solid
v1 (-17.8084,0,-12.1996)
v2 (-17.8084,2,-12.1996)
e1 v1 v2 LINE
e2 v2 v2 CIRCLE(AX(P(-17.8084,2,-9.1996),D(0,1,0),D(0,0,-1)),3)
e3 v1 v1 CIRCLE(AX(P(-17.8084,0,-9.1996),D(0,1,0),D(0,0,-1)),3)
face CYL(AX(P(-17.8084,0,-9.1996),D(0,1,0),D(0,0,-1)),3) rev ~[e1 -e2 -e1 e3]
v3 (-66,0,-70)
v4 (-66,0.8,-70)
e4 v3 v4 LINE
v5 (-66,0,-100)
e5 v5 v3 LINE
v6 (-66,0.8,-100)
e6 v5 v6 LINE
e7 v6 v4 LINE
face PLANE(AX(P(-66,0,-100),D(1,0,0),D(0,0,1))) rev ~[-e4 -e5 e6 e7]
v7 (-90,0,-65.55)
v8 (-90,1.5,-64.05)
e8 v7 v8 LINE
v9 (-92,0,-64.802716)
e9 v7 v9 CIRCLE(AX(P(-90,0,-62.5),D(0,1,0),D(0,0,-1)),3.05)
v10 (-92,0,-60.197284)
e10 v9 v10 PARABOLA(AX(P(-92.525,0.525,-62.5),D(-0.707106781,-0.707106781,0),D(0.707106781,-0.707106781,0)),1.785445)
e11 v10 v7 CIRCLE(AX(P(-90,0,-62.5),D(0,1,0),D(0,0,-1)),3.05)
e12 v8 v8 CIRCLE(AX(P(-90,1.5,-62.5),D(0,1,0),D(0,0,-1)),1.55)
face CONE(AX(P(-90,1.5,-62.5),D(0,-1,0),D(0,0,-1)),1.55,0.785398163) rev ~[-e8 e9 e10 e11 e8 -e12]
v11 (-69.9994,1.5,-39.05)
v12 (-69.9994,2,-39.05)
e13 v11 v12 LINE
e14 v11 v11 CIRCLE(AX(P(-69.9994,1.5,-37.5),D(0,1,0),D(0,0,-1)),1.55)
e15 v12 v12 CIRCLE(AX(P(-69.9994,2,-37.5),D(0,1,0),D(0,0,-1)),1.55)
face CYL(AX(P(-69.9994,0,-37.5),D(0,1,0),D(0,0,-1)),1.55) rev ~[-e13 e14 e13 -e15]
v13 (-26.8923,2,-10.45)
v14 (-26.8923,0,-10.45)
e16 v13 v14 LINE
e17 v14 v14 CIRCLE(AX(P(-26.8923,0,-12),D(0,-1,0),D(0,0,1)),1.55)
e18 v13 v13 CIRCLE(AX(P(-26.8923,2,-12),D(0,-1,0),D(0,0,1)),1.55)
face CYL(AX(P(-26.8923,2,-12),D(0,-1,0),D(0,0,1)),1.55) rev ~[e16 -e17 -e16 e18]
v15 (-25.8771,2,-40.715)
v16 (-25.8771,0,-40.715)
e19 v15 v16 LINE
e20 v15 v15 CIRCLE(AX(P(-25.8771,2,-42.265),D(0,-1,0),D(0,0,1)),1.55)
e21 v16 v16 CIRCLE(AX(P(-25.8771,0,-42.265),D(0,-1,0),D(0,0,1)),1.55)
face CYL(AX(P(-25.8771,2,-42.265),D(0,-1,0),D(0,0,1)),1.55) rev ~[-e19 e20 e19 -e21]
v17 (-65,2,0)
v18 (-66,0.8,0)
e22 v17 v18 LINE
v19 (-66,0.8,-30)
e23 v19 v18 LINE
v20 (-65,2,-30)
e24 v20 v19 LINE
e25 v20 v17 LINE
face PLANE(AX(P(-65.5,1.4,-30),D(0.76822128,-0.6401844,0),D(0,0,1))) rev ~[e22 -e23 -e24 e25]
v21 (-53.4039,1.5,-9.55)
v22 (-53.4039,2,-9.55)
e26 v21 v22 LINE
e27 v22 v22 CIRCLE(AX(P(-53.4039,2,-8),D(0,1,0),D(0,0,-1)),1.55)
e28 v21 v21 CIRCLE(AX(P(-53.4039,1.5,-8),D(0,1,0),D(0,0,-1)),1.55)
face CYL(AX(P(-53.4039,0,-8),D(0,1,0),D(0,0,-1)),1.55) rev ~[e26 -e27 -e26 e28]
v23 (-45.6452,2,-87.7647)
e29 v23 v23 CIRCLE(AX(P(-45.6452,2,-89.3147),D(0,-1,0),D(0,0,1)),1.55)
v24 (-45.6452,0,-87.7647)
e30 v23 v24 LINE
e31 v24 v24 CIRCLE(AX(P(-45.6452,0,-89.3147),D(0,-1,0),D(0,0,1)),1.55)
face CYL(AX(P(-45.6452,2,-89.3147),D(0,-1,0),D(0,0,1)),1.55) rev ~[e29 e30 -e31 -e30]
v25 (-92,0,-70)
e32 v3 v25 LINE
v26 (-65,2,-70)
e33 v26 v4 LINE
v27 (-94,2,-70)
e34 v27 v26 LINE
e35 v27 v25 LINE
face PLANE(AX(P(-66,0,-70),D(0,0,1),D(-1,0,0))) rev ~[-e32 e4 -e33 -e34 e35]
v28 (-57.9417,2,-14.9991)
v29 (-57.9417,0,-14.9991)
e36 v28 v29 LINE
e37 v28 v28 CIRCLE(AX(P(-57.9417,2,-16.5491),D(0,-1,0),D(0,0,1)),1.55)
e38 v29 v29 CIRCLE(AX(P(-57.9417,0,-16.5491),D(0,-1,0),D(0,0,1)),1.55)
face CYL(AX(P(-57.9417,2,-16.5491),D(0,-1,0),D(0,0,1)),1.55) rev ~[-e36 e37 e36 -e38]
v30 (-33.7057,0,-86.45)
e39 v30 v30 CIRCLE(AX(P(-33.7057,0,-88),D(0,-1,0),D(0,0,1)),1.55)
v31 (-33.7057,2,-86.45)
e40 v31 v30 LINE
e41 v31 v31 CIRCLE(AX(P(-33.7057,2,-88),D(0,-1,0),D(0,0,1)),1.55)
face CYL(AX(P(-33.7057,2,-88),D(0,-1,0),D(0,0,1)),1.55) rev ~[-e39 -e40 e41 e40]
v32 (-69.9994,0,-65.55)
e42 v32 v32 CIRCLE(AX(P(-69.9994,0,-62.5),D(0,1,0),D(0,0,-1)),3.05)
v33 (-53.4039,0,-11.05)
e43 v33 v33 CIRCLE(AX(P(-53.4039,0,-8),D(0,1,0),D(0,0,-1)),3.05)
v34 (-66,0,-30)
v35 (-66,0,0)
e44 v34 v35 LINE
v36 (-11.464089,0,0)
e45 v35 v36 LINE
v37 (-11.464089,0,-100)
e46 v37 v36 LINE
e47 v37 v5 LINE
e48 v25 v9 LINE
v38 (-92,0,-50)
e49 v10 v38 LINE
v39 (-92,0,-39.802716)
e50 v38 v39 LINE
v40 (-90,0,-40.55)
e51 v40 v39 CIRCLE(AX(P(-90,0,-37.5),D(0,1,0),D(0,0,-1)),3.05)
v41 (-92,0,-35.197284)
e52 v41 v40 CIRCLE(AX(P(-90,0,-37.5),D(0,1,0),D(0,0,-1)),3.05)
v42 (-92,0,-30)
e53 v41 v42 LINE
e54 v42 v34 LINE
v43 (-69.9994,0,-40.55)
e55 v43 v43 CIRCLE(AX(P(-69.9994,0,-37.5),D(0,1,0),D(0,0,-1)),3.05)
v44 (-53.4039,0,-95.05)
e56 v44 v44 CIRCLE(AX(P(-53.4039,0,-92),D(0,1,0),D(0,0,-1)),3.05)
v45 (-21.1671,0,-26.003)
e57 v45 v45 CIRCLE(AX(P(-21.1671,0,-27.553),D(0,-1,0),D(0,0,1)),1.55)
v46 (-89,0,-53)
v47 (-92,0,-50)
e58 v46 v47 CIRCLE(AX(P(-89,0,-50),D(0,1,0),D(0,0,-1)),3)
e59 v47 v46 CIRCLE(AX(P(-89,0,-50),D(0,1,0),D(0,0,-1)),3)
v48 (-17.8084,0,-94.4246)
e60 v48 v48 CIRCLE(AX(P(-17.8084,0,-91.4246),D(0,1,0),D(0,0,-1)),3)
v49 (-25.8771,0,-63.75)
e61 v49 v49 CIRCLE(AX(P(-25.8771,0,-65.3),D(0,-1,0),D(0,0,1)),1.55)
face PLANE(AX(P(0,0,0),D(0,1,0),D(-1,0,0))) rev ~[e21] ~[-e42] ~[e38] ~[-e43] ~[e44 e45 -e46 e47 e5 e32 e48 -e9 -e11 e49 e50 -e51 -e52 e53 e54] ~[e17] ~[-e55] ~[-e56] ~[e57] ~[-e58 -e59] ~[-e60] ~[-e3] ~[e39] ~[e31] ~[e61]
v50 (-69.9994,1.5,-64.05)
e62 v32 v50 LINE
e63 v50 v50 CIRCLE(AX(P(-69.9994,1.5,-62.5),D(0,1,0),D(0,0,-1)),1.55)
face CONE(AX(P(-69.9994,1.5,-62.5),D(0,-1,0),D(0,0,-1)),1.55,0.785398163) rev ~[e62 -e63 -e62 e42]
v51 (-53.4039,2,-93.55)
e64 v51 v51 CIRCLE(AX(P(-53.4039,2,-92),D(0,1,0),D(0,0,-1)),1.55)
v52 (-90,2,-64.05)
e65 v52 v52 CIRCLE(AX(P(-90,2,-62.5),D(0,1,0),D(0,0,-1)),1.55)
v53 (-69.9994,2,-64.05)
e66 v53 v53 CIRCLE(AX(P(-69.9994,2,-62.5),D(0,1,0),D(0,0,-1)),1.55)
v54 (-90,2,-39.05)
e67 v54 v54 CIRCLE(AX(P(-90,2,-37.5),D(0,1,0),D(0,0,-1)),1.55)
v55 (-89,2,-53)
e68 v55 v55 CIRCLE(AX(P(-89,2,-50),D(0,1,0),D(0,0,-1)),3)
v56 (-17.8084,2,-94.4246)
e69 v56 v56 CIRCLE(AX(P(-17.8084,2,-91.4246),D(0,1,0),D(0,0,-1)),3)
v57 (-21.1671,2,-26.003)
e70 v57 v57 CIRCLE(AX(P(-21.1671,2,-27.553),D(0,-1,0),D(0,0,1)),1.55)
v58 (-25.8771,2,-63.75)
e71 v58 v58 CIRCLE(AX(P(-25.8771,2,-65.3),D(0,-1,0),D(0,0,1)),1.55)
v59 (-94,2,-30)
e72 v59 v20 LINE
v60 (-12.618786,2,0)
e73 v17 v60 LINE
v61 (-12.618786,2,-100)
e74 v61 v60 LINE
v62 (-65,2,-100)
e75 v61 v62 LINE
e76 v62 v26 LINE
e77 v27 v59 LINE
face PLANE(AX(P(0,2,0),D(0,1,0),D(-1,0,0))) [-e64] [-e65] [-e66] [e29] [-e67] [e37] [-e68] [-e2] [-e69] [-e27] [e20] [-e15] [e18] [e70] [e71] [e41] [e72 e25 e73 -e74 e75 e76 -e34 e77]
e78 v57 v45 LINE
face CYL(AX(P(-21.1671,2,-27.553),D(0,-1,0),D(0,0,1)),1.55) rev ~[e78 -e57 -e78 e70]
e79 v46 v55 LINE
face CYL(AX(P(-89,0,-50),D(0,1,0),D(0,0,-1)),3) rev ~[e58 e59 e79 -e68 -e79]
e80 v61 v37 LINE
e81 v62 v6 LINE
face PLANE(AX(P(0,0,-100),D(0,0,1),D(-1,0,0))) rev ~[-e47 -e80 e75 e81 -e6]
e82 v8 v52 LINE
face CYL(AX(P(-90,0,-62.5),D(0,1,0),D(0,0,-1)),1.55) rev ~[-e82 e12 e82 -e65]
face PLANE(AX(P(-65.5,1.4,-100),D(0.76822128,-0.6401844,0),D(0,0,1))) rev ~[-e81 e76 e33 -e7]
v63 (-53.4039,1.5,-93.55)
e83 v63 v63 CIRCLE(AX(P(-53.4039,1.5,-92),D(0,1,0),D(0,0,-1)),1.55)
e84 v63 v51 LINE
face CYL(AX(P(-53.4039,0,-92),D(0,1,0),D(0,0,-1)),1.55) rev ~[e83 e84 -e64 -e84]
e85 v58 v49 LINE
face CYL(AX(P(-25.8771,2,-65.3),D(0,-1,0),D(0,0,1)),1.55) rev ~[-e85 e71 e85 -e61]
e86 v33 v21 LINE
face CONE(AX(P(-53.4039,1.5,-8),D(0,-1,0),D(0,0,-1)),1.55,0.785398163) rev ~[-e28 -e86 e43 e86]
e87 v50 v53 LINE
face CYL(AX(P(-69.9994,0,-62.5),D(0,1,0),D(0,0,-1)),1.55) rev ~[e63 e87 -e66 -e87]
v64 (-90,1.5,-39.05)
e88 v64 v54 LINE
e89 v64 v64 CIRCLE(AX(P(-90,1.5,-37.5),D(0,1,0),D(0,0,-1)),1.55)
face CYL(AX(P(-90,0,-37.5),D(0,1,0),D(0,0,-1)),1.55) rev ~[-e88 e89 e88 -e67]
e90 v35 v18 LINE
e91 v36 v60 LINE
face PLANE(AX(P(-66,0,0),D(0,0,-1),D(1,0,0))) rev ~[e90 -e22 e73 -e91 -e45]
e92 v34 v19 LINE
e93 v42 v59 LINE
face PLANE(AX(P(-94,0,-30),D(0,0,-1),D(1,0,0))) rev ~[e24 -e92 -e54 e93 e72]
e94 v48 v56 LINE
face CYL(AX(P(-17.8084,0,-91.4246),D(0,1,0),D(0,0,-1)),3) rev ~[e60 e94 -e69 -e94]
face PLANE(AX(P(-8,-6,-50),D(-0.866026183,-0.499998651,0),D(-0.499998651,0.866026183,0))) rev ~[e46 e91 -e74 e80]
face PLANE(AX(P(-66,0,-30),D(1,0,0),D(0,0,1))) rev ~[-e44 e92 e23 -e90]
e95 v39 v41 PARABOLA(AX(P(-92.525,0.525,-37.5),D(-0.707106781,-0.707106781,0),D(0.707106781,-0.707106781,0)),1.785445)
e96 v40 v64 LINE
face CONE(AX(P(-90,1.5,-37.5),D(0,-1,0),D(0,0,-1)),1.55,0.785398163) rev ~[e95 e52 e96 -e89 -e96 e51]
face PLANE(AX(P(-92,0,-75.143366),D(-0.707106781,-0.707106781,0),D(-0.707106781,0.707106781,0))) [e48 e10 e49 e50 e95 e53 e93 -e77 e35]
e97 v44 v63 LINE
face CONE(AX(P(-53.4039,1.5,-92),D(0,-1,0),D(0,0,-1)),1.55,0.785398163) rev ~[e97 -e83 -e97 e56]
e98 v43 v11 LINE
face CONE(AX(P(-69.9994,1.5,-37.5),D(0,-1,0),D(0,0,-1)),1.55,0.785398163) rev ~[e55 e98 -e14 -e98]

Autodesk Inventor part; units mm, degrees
ref_plane "YZ Plane" through (0, 0, 0) normal (1, 0, 0) x (0, 1, 0)
ref_plane "XZ Plane" through (0, 0, 0) normal (0, 1, 0) x (-1, 0, 0)
sketch "Sketch1" plane through (0, 0, 0) normal (0, 1, 0) x (-1, 0, 0)
  line L0 (0, 0) -> (0, -100)
  line L1 (0, -100) -> (66, -100)
  line L2 (66, -100) -> (66, -70)
  line L3 (66, -70) -> (94, -70)
  line L4 (94, -70) -> (94, -30)
  line L5 (94, -30) -> (66, -30)
  line L6 (66, -30) -> (66, 0)
  line L7 (66, 0) -> (0, 0)
  dimension "d0" = 100
  dimension "d2" = 30
  dimension "d4" = 40
  dimension "d7" = 66
  dimension "d27" = 94
extrude "Extrusion1" add sketch "Sketch1" along normal blind 2
ref_plane "Work Plane1" through (-66, 0, -50) normal (0, 0, 1) x (1, 0, 0)
sketch "Sketch2" plane through (0, 0, 0) normal (0, -1, 0) x (1, 0, 0)
  point P0 (0, 0)
  point P1 (-69.9994, -37.5)
  point P2 (-90, -37.5)
  point P3 (-69.9994, -62.5)
  point P4 (-90, -62.5)
hole "Hole1" at (-90, 0, -37.5) at (-69.9994, 0, -37.5) at (-69.9994, 0, -62.5) at (-90, 0, -62.5) direction (0, 1, 0) diameter 3.1 end through all
chamfer "Chamfer1" distance 1.5 angle 45 4 edges at (-90, 0, -60.95) (-69.9994, 0, -60.95) (-69.9994, 0, -35.95) (-90, 0, -35.95) measured on face at (-22.8202, 0, -45.8956)
chamfer "Chamfer2" distance 2 angle 45 1 edges at (-94, 0, -50)
sketch "Sketch3" plane through (-66, 0, -50) normal (0, 0, 1) x (1, 0, 0)
  line L0 (66, -6) -> (58, -6)
  line L1 (58, -6) -> (45.307, 15.985)
  line L2 (66, 0) -> (66, 2) projected
  line L3 (0, 0) -> (66, 0) projected
  line L4 (45.307, 15.985) -> (66, 15.985)
  line L5 (66, 15.985) -> (66, -6)
  line L6 (66, -6) -> (66, -6)
  point P0 (66, 1)
  dimension "d22" = 8
  dimension "d23" = 120
  dimension "d24" = 6
extrude "Extrusion2" cut sketch "Sketch3" along normal through all both and the other way through all
chamfer "Chamfer3" distance 1 distance2 1.2 2 edges at (-66, 2, -15) (-66, 2, -85) measured on face at (-31.2626, 2, -46.0165)
sketch "Sketch4" plane through (0, 0, 0) normal (0, -1, 0) x (1, 0, 0)
  line L0 (-67.7565, -100) -> (-11.4641, -100)
  line L1 (-11.4641, -100) -> (-11.4641, 0)
  line L2 (-11.4641, 0) -> (-67.7565, 0)
  point P0 (0, 0)
  point P1 (-53.4039, -92)
  point P2 (-53.4039, -8)
  point P3 (-11.4641, 0)
  dimension "d31" = 8
  dimension "d32" = 41.9398
  dimension "d33" = 41.9398
  dimension "d34" = 8
  dimension "d35" = 100
hole "Hole2" at (-53.4039, 0, -92) at (-53.4039, 0, -8) direction (0, 1, 0) diameter 3.1 end through all
chamfer "Chamfer4" distance 1.5 angle 45 2 edges at (-53.4039, 0, -90.45) (-53.4039, 0, -6.45) measured on face at (-29.9666, 0, -45.9559)
sketch "Sketch6" plane through (0, 2, 0) normal (0, 1, 0) x (1, 0, 0)
  line L0 (-11.4641, 100) -> (-11.4641, 0) projected
  line L1 (-12.6188, 100) -> (-11.4641, 100) projected
  line L2 (-12.6188, 0) -> (-12.6188, 100) projected
  line L3 (-11.4641, 0) -> (-12.6188, 0) projected
  line L4 (-12.6188, 100) -> (-65, 100) projected
  line L5 (-65, 0) -> (-12.6188, 0) projected
  line L6 (-12.6715, 100) -> (-66, 100)
  line L7 (-11.4641, 100) -> (-11.4641, 39.7608)
  point P0 (-25.8771, 42.265)
  point P1 (-25.8771, 65.3)
  point P2 (-33.7057, 88)
  point P3 (-26.8923, 12)
  dimension "d56" = 34.7
  dimension "d57" = 42.265
  dimension "d83" = 21.0869
  dimension "d84" = 12
  dimension "d85" = 12
  dimension "d87" = 14.2735
  dimension "d88" = 14.413
  dimension "d89" = 14.413
hole "Hole3" at (-33.7057, 2, -88) at (-25.8771, 2, -65.3) at (-25.8771, 2, -42.265) at (-26.8923, 2, -12) direction (0, -1, 0) diameter 3.1 end through all
sketch "Sketch7" plane through (0, 0, 0) normal (0, -1, 0) x (1, 0, 0)
  point P0 (0, 0)
sketch "Sketch8" plane through (0, 0, 0) normal (0, -1, 0) x (1, 0, 0)
  point P0 (0, 0)
  point P1 (-17.8084, -91.4246)
  point P2 (-17.8084, -9.1996)
  point P3 (-89, -50)
  point P4 (-17.8084, -9.1996)
  point P5 (-17.8084, -91.4246)
  point P6 (-89, -50)
hole "Hole4" at (-17.8084, 0, -9.1996) at (-17.8084, 0, -91.4246) at (-89, 0, -50) direction (0, 1, 0) diameter 6 end through all
sketch "Sketch10" plane through (0, 2, 0) normal (0, 1, 0) x (1, 0, 0)
  line L0 (-65, 0) -> (-12.6188, 0) projected
  line L1 (-11.4641, 100) -> (-11.4641, 0) projected
  point P0 (0, 0)
  point P1 (-57.9417, 16.5491)
  point P2 (-57.9417, 16.5491)
  point P3 (-45.6452, 89.3147)
  point P4 (-21.1671, 27.553)
  dimension "d91" = 9.703
  dimension "d92" = 27.553
hole "Hole6" at (-21.1671, 2, -27.553) at (-45.6452, 2, -89.3147) at (-57.9417, 2, -16.5491) direction (0, -1, 0) diameter 3.1 end through all
properties part number "podstawa" material "Steel"
